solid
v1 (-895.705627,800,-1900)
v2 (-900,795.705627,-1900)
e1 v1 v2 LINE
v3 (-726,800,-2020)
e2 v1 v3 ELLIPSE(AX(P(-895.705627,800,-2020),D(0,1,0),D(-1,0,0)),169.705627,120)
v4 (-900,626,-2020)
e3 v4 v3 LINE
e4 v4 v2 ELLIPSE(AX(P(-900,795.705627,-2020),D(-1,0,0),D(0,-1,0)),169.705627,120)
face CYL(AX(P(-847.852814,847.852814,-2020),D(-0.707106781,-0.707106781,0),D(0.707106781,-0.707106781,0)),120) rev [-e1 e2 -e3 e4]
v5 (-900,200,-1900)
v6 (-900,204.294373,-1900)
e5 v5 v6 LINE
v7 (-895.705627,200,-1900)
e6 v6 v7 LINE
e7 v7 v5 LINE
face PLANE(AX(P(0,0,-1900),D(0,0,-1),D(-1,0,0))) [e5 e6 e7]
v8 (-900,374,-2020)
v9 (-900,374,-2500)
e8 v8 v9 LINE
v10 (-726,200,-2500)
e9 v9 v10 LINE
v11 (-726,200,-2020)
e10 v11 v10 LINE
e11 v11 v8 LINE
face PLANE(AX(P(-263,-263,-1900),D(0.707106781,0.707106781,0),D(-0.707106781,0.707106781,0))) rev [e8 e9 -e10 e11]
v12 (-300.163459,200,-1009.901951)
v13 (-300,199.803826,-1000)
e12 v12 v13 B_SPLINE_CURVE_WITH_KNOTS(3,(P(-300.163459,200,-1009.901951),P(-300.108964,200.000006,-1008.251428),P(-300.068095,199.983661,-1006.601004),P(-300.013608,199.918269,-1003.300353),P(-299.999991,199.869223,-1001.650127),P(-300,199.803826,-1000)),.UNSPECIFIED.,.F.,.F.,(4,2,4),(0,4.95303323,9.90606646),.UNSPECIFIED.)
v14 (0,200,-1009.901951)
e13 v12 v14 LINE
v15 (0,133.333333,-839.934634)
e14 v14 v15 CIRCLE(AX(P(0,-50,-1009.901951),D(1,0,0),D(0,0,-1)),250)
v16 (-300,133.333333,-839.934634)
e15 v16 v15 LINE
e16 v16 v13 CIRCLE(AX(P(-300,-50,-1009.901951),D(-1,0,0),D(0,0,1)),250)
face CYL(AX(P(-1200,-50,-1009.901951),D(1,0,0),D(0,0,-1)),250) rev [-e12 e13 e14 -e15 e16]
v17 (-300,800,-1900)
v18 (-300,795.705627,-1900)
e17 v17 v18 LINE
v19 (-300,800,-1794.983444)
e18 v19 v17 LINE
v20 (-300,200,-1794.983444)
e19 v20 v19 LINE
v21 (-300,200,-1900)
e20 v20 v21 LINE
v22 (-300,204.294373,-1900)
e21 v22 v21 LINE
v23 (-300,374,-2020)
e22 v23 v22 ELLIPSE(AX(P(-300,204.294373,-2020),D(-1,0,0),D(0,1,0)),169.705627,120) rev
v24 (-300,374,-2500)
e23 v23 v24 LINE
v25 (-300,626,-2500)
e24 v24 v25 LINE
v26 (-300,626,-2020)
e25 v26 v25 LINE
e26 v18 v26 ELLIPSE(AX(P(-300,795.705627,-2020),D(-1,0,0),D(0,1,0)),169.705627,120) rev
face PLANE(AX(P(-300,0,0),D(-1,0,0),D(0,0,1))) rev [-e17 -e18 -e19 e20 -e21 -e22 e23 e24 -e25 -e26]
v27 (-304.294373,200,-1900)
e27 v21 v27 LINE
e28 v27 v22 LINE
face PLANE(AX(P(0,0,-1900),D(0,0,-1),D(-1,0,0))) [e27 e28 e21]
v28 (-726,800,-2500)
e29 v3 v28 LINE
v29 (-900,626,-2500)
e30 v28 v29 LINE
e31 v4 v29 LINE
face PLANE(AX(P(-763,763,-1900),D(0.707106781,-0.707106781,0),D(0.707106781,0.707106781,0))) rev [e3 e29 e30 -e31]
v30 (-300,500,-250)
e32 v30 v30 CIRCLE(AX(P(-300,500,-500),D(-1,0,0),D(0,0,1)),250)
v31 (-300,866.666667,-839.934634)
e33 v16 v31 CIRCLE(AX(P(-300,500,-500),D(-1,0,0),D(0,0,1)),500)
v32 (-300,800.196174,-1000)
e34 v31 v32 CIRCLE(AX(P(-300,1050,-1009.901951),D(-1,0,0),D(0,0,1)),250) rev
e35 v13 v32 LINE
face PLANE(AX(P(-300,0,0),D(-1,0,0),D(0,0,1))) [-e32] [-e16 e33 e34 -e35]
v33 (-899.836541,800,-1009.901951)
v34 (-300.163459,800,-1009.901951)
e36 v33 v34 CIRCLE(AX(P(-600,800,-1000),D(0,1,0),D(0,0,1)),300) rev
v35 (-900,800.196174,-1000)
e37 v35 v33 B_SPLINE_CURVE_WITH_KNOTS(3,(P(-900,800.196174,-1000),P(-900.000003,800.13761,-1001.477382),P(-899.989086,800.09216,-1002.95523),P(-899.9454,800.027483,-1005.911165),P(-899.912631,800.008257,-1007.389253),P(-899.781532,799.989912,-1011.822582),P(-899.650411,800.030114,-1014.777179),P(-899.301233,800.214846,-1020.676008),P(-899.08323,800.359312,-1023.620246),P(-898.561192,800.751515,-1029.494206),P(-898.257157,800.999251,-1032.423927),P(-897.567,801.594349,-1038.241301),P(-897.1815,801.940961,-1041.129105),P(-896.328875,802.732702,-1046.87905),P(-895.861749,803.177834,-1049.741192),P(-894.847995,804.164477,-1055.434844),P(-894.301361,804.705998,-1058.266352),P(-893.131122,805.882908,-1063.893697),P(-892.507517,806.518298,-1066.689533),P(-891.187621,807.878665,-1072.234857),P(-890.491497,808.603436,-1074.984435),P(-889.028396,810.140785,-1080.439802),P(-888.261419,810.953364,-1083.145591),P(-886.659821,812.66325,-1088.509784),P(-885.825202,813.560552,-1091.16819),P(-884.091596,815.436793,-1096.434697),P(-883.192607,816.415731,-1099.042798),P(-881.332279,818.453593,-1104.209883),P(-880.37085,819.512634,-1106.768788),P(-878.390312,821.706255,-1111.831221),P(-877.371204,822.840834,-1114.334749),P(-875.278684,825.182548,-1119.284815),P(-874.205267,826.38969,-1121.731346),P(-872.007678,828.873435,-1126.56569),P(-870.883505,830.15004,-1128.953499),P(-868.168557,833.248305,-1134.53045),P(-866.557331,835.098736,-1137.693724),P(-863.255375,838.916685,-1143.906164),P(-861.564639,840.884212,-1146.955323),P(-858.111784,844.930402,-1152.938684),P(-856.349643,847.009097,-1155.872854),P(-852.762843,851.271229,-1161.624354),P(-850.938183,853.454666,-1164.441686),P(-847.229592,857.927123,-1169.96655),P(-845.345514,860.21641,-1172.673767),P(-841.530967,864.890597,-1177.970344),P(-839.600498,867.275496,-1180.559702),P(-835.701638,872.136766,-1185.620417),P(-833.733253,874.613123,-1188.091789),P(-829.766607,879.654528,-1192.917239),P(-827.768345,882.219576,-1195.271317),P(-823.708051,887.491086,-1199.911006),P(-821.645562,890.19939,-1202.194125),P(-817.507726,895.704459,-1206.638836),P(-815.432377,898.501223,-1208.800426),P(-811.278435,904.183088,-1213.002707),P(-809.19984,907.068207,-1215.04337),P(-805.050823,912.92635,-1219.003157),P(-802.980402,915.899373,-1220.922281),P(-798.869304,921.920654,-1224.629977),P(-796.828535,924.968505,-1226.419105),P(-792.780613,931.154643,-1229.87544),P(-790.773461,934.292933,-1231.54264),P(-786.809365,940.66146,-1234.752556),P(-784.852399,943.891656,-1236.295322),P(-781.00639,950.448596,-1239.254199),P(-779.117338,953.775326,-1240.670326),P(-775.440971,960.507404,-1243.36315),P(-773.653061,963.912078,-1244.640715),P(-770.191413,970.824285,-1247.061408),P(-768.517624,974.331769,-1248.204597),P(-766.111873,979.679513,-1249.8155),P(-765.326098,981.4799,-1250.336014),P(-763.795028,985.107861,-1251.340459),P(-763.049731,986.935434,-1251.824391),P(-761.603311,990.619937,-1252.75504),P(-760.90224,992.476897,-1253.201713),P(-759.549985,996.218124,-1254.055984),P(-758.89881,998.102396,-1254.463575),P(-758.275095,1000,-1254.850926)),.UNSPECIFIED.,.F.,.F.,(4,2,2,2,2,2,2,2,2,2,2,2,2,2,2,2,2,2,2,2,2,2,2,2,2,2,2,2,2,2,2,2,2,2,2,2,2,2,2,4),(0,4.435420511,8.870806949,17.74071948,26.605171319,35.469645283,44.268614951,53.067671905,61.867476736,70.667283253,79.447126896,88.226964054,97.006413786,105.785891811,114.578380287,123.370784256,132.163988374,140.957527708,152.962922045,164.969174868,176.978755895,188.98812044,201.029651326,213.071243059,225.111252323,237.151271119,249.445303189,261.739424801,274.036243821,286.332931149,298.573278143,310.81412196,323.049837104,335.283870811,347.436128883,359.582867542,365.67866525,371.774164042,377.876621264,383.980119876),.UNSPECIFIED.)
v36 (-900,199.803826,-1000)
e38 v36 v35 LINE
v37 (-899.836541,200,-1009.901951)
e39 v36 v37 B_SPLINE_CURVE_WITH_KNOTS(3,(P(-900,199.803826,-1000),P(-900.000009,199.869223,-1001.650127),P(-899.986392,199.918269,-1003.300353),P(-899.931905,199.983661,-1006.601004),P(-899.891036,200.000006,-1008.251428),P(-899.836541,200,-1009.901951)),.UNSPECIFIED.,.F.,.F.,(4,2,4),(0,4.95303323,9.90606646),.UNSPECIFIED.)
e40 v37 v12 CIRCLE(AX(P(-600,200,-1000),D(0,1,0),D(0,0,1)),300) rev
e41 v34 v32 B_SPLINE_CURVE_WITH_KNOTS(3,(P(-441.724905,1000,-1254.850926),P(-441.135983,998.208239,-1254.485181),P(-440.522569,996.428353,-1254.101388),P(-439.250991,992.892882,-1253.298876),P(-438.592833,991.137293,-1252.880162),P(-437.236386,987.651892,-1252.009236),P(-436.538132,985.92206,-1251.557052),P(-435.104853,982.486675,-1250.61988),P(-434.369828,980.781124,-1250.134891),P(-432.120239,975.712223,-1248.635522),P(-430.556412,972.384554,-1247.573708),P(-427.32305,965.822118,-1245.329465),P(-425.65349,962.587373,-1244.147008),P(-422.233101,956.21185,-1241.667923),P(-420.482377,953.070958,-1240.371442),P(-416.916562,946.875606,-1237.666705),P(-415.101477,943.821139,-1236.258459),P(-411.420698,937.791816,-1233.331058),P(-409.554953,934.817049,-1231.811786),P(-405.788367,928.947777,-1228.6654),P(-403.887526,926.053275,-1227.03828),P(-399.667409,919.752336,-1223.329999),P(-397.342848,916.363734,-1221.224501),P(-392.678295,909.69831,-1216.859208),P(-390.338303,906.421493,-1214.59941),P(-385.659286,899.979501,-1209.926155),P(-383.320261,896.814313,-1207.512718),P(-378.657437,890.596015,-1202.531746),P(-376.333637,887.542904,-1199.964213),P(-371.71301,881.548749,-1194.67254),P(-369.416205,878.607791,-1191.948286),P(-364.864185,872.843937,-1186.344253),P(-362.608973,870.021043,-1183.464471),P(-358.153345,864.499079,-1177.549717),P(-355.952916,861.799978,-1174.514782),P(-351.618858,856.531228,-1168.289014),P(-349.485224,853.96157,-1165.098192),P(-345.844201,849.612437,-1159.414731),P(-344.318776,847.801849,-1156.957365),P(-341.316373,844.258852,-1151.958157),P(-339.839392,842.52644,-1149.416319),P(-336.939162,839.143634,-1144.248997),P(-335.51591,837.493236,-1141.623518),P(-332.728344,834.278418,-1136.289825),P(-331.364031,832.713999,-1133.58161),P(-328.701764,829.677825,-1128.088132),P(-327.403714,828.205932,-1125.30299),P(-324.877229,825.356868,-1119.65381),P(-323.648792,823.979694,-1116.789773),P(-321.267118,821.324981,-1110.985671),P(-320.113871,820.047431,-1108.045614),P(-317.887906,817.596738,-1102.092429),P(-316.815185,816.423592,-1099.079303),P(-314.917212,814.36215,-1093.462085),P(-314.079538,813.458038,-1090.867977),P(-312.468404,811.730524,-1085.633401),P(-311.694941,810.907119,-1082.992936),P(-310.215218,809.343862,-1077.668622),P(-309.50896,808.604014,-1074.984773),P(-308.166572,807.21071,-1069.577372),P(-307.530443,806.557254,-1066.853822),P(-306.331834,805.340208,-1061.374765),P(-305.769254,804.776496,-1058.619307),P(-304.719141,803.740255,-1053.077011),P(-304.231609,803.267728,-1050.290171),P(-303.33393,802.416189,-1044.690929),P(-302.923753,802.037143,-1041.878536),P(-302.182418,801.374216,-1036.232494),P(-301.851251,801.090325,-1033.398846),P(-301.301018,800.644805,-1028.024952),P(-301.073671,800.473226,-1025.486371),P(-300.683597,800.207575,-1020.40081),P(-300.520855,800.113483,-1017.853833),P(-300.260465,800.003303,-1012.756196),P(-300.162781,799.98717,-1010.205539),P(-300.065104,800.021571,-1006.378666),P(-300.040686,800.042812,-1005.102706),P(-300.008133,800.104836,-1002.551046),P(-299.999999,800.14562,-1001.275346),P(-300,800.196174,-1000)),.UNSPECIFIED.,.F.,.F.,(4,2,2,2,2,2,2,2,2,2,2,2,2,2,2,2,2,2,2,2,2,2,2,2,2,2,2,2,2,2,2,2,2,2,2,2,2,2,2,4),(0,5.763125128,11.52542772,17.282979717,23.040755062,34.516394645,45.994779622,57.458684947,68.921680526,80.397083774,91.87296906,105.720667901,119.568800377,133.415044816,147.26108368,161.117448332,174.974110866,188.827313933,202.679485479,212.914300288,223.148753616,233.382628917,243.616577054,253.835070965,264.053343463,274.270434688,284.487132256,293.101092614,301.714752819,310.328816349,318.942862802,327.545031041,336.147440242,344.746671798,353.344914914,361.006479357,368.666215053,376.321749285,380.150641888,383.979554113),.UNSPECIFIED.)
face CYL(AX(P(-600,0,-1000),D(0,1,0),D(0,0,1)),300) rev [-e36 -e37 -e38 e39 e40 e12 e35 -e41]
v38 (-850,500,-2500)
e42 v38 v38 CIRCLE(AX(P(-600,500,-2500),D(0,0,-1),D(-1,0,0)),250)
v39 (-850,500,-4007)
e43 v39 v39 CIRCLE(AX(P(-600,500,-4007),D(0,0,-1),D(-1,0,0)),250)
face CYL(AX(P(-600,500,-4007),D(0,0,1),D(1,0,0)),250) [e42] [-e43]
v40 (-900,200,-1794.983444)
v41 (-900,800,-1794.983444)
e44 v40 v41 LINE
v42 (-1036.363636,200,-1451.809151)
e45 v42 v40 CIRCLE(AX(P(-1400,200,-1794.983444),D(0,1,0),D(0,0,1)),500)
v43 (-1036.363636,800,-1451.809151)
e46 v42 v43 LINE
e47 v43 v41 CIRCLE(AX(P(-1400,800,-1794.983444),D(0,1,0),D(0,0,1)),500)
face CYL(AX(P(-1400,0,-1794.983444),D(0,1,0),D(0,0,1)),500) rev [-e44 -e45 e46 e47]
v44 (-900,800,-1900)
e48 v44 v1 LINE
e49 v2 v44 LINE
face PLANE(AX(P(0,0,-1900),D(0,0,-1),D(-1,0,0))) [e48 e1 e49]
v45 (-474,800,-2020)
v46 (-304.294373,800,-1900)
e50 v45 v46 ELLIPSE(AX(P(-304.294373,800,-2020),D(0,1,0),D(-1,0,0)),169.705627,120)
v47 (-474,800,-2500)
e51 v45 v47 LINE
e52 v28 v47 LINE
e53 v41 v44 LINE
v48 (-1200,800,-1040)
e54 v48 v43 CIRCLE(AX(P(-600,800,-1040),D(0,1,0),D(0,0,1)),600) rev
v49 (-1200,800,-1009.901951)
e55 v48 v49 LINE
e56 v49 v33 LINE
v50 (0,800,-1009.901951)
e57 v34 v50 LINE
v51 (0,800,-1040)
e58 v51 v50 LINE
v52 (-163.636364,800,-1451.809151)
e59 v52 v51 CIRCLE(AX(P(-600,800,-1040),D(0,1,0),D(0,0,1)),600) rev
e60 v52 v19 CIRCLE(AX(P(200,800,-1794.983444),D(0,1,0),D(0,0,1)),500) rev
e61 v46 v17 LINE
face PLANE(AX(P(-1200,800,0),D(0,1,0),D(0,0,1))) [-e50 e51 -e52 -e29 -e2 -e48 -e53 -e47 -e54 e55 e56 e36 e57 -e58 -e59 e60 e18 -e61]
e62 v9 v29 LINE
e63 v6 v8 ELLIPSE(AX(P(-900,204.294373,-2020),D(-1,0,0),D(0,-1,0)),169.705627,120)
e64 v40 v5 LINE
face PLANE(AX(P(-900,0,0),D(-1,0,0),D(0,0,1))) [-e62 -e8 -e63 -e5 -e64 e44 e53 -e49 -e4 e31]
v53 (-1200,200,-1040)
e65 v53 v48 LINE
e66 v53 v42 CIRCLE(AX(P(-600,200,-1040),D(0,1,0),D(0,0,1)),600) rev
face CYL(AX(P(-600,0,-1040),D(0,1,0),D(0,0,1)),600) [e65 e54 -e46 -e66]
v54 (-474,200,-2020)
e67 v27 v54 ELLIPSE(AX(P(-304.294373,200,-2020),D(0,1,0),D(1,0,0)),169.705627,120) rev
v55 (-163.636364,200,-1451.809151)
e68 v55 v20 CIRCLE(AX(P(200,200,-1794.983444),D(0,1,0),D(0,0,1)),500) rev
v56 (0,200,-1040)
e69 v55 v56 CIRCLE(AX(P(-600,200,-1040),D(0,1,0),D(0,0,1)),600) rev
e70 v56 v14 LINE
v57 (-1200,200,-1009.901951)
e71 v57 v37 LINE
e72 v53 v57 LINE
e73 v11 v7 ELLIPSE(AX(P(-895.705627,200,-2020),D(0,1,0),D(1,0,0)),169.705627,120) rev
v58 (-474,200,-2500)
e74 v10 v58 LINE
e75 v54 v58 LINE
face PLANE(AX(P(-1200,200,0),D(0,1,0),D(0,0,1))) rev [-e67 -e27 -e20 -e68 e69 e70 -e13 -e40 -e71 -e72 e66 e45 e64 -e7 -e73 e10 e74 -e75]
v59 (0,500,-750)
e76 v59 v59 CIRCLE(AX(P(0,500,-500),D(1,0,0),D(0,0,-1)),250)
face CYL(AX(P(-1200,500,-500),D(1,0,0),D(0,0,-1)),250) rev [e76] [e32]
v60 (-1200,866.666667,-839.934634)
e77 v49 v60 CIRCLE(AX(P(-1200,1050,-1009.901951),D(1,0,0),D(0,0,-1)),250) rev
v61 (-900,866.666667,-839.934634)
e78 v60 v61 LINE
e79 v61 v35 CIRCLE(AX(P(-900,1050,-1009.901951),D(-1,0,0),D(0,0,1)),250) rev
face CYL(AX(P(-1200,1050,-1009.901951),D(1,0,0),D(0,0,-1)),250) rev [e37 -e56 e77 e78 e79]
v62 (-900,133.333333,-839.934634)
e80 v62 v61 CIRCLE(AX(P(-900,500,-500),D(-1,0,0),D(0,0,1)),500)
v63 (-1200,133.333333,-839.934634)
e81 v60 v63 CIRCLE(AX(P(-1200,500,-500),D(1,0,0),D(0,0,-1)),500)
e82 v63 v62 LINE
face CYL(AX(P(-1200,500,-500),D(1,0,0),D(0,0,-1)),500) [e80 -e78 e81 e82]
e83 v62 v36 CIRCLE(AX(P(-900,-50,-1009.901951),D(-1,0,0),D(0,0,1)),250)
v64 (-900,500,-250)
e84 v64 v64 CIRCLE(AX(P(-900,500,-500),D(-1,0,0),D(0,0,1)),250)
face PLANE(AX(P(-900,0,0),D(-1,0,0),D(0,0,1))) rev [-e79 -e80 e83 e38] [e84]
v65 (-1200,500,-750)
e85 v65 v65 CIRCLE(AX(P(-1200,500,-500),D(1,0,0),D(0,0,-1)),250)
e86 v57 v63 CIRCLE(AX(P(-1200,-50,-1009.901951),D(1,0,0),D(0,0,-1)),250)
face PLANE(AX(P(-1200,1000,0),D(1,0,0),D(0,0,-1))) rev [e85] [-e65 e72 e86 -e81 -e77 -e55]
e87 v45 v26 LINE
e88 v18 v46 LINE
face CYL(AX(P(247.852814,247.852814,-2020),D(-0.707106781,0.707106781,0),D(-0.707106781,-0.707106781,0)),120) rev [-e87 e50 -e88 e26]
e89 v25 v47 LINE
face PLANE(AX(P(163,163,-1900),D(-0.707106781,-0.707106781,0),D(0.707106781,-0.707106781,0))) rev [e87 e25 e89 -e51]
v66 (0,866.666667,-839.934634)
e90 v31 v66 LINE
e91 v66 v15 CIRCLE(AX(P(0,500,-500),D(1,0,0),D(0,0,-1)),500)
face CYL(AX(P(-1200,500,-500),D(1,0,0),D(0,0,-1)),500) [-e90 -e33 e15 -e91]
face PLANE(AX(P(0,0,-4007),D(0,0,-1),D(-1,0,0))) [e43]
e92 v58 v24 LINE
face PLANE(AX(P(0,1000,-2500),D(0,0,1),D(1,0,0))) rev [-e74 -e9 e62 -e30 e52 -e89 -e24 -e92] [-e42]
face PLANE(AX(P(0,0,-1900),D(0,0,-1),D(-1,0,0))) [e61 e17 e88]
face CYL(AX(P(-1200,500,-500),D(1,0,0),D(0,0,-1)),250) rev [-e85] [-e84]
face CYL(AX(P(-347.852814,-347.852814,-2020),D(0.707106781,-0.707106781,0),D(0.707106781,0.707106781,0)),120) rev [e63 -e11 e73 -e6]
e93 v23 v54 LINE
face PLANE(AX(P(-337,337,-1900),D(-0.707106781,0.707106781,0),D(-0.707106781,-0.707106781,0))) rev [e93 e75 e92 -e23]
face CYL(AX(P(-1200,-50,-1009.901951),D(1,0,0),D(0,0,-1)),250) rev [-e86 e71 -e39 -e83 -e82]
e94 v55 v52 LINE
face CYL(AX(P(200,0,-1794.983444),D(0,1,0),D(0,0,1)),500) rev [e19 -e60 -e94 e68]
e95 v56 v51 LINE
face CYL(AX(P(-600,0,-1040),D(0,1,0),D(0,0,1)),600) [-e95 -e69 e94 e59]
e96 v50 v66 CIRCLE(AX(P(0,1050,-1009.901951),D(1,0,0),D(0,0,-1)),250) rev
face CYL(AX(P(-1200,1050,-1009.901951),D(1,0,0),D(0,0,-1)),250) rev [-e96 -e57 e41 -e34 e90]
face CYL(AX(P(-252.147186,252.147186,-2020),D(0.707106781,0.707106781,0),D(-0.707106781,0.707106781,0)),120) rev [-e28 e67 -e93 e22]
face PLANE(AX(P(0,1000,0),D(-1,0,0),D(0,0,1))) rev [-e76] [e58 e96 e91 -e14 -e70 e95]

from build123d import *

# Parameters (mm, degrees)
SKETCH2_W           = 1200
SKETCH2_H           = 2500
BOSS_EXTRUDE1_DEPTH = 1000
CUT_EXTRUDE4_DEPTH  = 2948.880594597
CUT_EXTRUDE5_DEPTH  = 2948.880594597
SKETCH4_R           = 250
CUT_EXTRUDE6_DEPTH  = 2948.880594597
CUT_EXTRUDE7_DEPTH  = 600
SKETCH5_3_R         = 250
BOSS_EXTRUDE2_DEPTH = 1507
FILLET2_R           = 120
FILLET3_R           = 120
FILLET4_R           = 120
FILLET5_R           = 120


with BuildPart() as part:
    # Sketch2 → Boss-Extrude1 (new body)
    with BuildSketch(Plane(origin=(0, 0, 0), x_dir=(1, 0, 0), z_dir=(0, 1, 0))):
        with Locations((-600, 1250)):
            Rectangle(SKETCH2_W, SKETCH2_H)
    extrude(amount=BOSS_EXTRUDE1_DEPTH)

    # Sketch3 → Cut-Extrude4 (cut, through all)
    with BuildSketch(Plane(origin=(0, 1000, 0), x_dir=(1, 0, 0), z_dir=(0, 1, 0))):
        with BuildLine():
            Line((-900, 1794.983443527), (-900, 2500))
            Line((-900, 2500), (-1200, 2500))
            Line((-1200, 2500), (-1200, 1040))
            ThreePointArc((-1200, 1040), (-1157.592226371, 1261.564683763), (-1036.363636364, 1451.809151015))
            ThreePointArc((-1036.363636364, 1451.809151015), (-935.339811358, 1610.346207058), (-900, 1794.983443527))
        make_face()
        with BuildLine():
            Line((0, 2500), (-300, 2500))
            Line((-300, 2500), (-300, 1794.983443527))
            ThreePointArc((-300, 1794.983443527), (-264.660188642, 1610.346207058), (-163.636363636, 1451.809151015))
            ThreePointArc((-163.636363636, 1451.809151015), (-42.407773629, 1261.564683763), (0, 1040))
            Line((0, 1040), (0, 2500))
        make_face()
    extrude(amount=-CUT_EXTRUDE4_DEPTH, mode=Mode.SUBTRACT)

    # Sketch3<4> → Cut-Extrude5 (cut, through all)
    with BuildSketch(Plane(origin=(0, 1000, 0), x_dir=(1, 0, 0), z_dir=(0, 1, 0))):
        with BuildLine():
            ThreePointArc((-300, 1000), (-600, 1300), (-900, 1000))
            Line((-900, 1000), (-900, 0))
            Line((-900, 0), (-300, 0))
            Line((-300, 0), (-300, 1000))
        make_face()
    extrude(amount=-CUT_EXTRUDE5_DEPTH, mode=Mode.SUBTRACT)

    # Sketch4 → Cut-Extrude6 (cut, through all)
    with BuildSketch(Plane(origin=(0, 0, 0), x_dir=(0, 0, -1), z_dir=(1, 0, 0))):
        with BuildLine():
            Line((2500, 800), (2500, 1000))
            Line((2500, 1000), (500.000001046, 1000))
            ThreePointArc((500.000001046, 1000), (682.574186322, 965.474667935), (839.93463424, 866.666666667))
            ThreePointArc((839.93463424, 866.666666667), (918.614858442, 817.262665937), (1009.901951359, 800))
            Line((1009.901951359, 800), (2500, 800))
        make_face()
        with BuildLine():
            Line((2500, 0), (2500, 200))
            Line((2500, 200), (1009.901951359, 200))
            ThreePointArc((1009.901951359, 200), (918.614858442, 182.737334063), (839.93463424, 133.333333333))
            ThreePointArc((839.93463424, 133.333333333), (682.574185835, 34.525331874), (500, 0))
            Line((500, 0), (2500, 0))
        make_face()
        with BuildLine():
            ThreePointArc((0, 500), (146.446609777, 853.553390963), (500.000001046, 1000))
            Line((500.000001046, 1000), (0, 1000))
            Line((0, 1000), (0, 500))
        make_face()
        with BuildLine():
            Line((0, 0), (500, 0))
            ThreePointArc((500, 0), (146.446609407, 146.446609407), (0, 500))
            Line((0, 500), (0, 0))
        make_face()
        with Locations((500, 500)):
            Circle(SKETCH4_R)
    extrude(amount=-CUT_EXTRUDE6_DEPTH, mode=Mode.SUBTRACT)

    # Sketch5 → Cut-Extrude7 (cut)
    with BuildSketch(Plane(origin=(0, 0, -2500), x_dir=(-1, 0, 0), z_dir=(0, 0, -1))):
        Polygon((900, 626), (900, 800), (726, 800), align=None)
        Polygon((900, 200), (900, 374), (726, 200), align=None)
        Polygon((300, 626), (474, 800), (300, 800), align=None)
        Polygon((474, 200), (300, 374), (300, 200), align=None)
    extrude(amount=-CUT_EXTRUDE7_DEPTH, mode=Mode.SUBTRACT)

    # Sketch5<3> → Boss-Extrude2 (add)
    with BuildSketch(Plane(origin=(0, 0, -2500), x_dir=(-1, 0, 0), z_dir=(0, 0, -1))):
        with Locations((600, 500)):
            Circle(SKETCH5_3_R)
    extrude(amount=BOSS_EXTRUDE2_DEPTH)

    # Fillet2
    fillet2_edges = [part.edges().sort_by_distance(p)[0] for p in [
        (-387, 713, -1900),
    ]]
    fillet(fillet2_edges, radius=FILLET2_R)

    # Fillet3
    fillet3_edges = [part.edges().sort_by_distance(p)[0] for p in [
        (-387, 287, -1900),
    ]]
    fillet(fillet3_edges, radius=FILLET3_R)

    # Fillet4
    fillet4_edges = [part.edges().sort_by_distance(p)[0] for p in [
        (-813, 713, -1900),
    ]]
    fillet(fillet4_edges, radius=FILLET4_R)

    # Fillet5
    fillet5_edges = [part.edges().sort_by_distance(p)[0] for p in [
        (-813, 287, -1900),
    ]]
    fillet(fillet5_edges, radius=FILLET5_R)


solid = part.part
